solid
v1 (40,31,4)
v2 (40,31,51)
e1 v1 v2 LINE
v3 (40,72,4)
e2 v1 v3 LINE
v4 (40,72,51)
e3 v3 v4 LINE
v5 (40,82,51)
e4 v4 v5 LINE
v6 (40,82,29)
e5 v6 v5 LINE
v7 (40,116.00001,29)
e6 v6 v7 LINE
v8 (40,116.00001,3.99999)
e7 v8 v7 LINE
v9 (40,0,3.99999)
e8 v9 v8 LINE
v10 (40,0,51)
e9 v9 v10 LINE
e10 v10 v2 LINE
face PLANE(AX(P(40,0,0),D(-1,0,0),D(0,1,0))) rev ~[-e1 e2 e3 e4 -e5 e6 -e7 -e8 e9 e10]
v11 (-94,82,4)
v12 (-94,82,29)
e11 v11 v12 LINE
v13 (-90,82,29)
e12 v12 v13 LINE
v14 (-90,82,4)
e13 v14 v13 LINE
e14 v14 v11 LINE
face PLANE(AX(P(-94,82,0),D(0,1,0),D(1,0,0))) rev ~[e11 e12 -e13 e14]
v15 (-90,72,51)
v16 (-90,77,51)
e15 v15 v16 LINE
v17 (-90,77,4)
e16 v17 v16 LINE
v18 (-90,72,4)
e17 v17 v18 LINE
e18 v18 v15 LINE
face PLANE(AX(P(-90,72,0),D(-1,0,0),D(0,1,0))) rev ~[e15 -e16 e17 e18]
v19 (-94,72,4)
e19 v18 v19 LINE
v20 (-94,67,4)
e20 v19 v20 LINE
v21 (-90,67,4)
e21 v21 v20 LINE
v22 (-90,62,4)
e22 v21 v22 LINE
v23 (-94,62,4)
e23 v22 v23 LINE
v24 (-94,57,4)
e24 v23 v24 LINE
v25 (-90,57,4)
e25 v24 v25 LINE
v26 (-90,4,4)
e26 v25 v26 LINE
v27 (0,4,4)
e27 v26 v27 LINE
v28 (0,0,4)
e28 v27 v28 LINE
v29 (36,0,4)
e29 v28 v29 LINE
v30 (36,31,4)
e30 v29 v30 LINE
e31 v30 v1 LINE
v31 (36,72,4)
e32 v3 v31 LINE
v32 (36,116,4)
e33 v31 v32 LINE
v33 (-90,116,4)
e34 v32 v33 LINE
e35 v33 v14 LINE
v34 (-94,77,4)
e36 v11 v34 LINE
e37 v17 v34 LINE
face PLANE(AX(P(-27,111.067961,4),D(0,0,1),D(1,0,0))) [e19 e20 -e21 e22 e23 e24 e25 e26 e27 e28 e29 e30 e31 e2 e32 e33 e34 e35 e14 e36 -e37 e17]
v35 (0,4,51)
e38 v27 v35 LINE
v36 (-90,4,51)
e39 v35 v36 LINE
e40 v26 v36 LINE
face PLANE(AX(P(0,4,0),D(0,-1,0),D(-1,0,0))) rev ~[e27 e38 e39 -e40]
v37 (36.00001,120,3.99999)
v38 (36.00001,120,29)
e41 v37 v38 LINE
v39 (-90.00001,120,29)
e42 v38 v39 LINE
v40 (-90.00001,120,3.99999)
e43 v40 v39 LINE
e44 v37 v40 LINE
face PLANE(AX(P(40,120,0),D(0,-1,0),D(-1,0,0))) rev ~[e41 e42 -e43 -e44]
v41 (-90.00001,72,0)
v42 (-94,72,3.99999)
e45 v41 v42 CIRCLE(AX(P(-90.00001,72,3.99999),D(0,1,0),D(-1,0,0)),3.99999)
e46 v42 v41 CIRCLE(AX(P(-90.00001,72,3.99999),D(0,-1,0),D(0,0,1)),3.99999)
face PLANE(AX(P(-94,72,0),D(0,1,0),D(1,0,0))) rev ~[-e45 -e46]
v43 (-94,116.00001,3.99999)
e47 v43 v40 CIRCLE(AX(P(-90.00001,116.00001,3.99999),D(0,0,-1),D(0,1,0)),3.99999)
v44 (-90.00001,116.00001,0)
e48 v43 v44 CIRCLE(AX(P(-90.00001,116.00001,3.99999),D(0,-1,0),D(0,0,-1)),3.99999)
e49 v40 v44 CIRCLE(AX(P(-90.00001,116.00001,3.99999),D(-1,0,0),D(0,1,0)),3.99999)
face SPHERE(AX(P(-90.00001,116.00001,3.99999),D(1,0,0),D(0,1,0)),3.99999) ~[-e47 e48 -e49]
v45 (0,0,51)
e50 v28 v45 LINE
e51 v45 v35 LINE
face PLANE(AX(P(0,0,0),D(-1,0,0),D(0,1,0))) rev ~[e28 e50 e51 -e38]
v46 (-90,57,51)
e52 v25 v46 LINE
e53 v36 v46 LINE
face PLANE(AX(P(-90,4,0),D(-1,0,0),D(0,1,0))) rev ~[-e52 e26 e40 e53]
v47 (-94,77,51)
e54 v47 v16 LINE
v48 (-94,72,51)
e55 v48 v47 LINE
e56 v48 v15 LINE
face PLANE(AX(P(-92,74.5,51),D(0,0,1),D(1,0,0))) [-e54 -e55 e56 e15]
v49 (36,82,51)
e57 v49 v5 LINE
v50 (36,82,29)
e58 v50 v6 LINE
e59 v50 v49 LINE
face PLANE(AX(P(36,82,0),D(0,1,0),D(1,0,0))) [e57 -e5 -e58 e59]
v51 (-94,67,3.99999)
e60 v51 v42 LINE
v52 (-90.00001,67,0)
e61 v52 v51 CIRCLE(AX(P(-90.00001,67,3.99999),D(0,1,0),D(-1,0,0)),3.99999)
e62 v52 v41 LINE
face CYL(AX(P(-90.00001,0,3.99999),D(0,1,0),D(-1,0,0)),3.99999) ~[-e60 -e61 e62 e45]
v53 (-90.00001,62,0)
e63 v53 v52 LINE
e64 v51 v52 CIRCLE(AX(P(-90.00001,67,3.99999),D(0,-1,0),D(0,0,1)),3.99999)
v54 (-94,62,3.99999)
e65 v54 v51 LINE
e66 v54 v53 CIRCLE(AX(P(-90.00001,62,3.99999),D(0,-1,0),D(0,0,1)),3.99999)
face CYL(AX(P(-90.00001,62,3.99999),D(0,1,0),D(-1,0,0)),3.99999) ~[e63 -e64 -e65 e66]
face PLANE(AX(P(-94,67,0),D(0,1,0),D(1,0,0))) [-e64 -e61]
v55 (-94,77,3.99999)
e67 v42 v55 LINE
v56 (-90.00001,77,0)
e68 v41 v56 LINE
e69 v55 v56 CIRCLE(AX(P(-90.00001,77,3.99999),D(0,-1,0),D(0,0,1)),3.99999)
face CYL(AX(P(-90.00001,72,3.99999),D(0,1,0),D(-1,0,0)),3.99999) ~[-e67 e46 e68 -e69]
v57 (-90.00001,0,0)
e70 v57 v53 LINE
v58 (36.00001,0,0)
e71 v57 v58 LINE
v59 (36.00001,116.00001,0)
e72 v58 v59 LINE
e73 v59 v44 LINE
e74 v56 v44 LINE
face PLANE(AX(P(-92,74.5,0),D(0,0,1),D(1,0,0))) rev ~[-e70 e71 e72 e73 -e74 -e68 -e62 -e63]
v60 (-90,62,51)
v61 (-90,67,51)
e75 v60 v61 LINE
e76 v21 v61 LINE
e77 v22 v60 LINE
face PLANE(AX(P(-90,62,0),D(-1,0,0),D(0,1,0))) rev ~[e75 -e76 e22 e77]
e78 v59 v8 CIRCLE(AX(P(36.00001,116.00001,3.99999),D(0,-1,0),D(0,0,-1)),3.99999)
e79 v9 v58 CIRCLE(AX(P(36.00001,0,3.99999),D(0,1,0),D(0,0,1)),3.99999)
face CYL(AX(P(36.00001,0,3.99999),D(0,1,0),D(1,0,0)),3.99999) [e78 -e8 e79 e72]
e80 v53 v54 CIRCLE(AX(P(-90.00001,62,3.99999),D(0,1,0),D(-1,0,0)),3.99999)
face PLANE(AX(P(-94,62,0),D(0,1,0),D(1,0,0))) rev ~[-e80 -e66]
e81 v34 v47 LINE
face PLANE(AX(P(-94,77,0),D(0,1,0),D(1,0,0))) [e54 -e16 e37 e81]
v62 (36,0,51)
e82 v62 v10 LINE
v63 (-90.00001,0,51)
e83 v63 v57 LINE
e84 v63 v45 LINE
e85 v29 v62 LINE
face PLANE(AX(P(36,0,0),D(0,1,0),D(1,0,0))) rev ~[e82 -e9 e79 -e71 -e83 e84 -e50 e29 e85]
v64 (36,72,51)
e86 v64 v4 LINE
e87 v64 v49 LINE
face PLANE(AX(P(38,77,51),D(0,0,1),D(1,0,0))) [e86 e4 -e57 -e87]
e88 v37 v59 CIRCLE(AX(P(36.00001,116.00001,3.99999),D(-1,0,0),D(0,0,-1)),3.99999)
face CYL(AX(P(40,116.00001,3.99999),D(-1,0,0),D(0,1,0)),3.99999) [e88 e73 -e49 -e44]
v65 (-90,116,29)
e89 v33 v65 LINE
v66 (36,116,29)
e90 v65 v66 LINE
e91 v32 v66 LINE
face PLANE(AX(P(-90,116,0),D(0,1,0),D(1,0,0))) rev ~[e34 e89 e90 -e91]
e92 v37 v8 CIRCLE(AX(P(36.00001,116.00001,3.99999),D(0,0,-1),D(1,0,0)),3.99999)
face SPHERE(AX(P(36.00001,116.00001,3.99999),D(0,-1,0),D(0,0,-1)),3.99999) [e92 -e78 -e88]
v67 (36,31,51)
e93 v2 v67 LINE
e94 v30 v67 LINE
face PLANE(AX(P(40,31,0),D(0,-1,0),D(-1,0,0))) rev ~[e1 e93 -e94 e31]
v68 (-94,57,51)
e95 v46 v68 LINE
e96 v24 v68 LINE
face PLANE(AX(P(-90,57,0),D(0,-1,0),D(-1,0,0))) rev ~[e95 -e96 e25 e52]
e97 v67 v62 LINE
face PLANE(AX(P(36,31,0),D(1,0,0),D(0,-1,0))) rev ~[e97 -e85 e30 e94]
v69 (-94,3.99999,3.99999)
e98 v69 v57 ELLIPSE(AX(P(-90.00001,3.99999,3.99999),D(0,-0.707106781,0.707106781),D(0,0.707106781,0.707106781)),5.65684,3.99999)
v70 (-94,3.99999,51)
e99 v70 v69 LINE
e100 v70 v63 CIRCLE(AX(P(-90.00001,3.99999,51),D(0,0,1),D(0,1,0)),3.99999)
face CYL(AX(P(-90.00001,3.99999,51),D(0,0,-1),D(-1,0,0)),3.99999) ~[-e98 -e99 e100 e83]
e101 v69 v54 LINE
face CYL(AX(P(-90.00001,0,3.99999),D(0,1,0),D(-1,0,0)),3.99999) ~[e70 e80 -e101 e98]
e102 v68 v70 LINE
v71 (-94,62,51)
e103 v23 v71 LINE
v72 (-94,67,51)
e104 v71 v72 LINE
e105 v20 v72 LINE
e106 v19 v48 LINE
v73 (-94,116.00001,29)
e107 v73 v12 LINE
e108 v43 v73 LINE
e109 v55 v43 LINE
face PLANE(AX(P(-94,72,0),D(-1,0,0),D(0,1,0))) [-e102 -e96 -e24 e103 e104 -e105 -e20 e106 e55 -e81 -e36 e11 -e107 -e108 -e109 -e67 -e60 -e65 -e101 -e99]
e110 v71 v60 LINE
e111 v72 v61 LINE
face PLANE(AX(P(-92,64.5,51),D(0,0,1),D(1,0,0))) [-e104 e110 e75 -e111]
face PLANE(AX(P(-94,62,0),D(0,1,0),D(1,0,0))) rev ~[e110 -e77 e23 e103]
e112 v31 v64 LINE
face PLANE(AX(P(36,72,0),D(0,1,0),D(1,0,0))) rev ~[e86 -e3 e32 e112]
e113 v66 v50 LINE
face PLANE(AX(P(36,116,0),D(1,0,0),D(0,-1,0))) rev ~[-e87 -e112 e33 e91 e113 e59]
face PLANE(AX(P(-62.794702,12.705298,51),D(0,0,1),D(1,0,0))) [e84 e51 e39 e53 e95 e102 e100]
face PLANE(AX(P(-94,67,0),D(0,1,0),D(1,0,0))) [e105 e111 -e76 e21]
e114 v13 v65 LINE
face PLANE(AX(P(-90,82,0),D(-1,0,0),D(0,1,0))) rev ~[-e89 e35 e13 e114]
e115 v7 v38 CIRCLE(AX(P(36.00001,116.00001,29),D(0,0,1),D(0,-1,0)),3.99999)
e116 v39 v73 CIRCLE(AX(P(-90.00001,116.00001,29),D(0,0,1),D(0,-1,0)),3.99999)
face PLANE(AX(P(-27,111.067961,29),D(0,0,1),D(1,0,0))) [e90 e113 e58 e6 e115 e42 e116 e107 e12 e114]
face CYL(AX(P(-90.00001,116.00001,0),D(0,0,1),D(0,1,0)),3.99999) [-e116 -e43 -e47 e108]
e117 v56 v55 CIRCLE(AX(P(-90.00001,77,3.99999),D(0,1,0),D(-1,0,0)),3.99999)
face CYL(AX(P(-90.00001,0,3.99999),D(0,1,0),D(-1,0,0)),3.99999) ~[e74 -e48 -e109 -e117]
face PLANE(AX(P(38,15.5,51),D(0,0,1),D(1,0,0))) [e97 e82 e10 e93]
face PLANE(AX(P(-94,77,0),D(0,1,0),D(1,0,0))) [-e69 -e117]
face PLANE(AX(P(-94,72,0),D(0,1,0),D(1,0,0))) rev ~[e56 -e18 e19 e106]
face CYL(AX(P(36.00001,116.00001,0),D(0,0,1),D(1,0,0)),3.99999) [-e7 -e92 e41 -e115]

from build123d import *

# Parameters (mm, degrees)
F0_W     = 4
F0_H     = 41
F0_H_2   = 10
F0_H_3   = 5
F0_W_2   = 36
F0_H_4   = 4
F0_W_3   = 126
F0_H_5   = 34
F1_DEPTH = 4
F2_DEPTH = 51
F3_DEPTH = 29
F4_R     = 3.99999
F5_DEPTH = 51
F6_R     = 3.99999


# Not quite as in the source:
# - a fillet or chamfer is up to 0.001 mm smaller than in the source, because OpenCascade refuses the exact size
# - a feature names something its author has since deleted; it is built from what else it names


with BuildPart() as f1:
    # F0 (on Top) → F1 (new body)
    with BuildSketch(Plane.XY):
        Polygon((36, 82), (40, 82), (40, 120), (-94, 120), (-94, 82), (-90, 82), (-90, 116), (36, 116), align=None)
        Polygon((-94, 0), (0, 0), (0, 4), (-90, 4), (-90, 57), (-94, 57), align=None)
        with Locations((38, 51.5)):
            Rectangle(F0_W, F0_H)
        with Locations((38, 77)):
            Rectangle(F0_W, F0_H_2)
        with Locations((-92, 79.5)):
            Rectangle(F0_W, F0_H_3)
        with Locations((-92, 59.5)):
            Rectangle(F0_W, F0_H_3)
        with Locations((-92, 69.5)):
            Rectangle(F0_W, F0_H_3)
        with Locations((-92, 74.5)):
            Rectangle(F0_W, F0_H_3)
        with Locations((-92, 64.5)):
            Rectangle(F0_W, F0_H_3)
        with Locations((18, 2)):
            Rectangle(F0_W_2, F0_H_4)
        with Locations((-27, 99)):
            Rectangle(F0_W_3, F0_H_5)
        Polygon((-90, 4), (0, 4), (36, 4), (36, 31), (36, 72), (36, 82), (-90, 82), (-90, 77), (-90, 72), (-90, 67), (-90, 62), (-90, 57), align=None)
    extrude(amount=F1_DEPTH)

    # F0 (on Top) → F2 (join)
    with BuildSketch(Plane.XY):
        Polygon((36, 4), (36, 0), (40, 0), (40, 31), (36, 31), align=None)
        with Locations((38, 77)):
            Rectangle(F0_W, F0_H_2)
        Polygon((-94, 0), (0, 0), (0, 4), (-90, 4), (-90, 57), (-94, 57), align=None)
    extrude(amount=F2_DEPTH)

    # F0 (on Top) → F3 (join)
    with BuildSketch(Plane.XY):
        Polygon((36, 82), (40, 82), (40, 120), (-94, 120), (-94, 82), (-90, 82), (-90, 116), (36, 116), align=None)
    extrude(amount=F3_DEPTH)

    # F4 (radius 4 in the source; OpenCascade refuses exactly that, so slightly less here)
    f4_edges = [f1.edges().sort_by_distance(p)[0] for p in [
        (40, 60, 0),
        (-27, 120, 0),
        (40, 120, 14.5),
        (-94, 120, 14.5),
        (-94, 60, 0),
        (-94, 0, 25.5),
    ]]
    fillet(f4_edges, radius=F4_R)

    # F0 (on Top) → F5 (join)
    with BuildSketch(Plane.XY):
        with Locations((-92, 74.5)):
            Rectangle(F0_W, F0_H_3)
        with Locations((-92, 64.5)):
            Rectangle(F0_W, F0_H_3)
    extrude(amount=F5_DEPTH)

    # F6 (radius 4 in the source; OpenCascade refuses exactly that, so slightly less here)
    f6_edges = [f1.edges().sort_by_distance(p)[0] for p in [
        (-94, 74.5, 0),
        (-94, 64.5, 0),
    ]]
    fillet(f6_edges, radius=F6_R)


solid = f1.part
